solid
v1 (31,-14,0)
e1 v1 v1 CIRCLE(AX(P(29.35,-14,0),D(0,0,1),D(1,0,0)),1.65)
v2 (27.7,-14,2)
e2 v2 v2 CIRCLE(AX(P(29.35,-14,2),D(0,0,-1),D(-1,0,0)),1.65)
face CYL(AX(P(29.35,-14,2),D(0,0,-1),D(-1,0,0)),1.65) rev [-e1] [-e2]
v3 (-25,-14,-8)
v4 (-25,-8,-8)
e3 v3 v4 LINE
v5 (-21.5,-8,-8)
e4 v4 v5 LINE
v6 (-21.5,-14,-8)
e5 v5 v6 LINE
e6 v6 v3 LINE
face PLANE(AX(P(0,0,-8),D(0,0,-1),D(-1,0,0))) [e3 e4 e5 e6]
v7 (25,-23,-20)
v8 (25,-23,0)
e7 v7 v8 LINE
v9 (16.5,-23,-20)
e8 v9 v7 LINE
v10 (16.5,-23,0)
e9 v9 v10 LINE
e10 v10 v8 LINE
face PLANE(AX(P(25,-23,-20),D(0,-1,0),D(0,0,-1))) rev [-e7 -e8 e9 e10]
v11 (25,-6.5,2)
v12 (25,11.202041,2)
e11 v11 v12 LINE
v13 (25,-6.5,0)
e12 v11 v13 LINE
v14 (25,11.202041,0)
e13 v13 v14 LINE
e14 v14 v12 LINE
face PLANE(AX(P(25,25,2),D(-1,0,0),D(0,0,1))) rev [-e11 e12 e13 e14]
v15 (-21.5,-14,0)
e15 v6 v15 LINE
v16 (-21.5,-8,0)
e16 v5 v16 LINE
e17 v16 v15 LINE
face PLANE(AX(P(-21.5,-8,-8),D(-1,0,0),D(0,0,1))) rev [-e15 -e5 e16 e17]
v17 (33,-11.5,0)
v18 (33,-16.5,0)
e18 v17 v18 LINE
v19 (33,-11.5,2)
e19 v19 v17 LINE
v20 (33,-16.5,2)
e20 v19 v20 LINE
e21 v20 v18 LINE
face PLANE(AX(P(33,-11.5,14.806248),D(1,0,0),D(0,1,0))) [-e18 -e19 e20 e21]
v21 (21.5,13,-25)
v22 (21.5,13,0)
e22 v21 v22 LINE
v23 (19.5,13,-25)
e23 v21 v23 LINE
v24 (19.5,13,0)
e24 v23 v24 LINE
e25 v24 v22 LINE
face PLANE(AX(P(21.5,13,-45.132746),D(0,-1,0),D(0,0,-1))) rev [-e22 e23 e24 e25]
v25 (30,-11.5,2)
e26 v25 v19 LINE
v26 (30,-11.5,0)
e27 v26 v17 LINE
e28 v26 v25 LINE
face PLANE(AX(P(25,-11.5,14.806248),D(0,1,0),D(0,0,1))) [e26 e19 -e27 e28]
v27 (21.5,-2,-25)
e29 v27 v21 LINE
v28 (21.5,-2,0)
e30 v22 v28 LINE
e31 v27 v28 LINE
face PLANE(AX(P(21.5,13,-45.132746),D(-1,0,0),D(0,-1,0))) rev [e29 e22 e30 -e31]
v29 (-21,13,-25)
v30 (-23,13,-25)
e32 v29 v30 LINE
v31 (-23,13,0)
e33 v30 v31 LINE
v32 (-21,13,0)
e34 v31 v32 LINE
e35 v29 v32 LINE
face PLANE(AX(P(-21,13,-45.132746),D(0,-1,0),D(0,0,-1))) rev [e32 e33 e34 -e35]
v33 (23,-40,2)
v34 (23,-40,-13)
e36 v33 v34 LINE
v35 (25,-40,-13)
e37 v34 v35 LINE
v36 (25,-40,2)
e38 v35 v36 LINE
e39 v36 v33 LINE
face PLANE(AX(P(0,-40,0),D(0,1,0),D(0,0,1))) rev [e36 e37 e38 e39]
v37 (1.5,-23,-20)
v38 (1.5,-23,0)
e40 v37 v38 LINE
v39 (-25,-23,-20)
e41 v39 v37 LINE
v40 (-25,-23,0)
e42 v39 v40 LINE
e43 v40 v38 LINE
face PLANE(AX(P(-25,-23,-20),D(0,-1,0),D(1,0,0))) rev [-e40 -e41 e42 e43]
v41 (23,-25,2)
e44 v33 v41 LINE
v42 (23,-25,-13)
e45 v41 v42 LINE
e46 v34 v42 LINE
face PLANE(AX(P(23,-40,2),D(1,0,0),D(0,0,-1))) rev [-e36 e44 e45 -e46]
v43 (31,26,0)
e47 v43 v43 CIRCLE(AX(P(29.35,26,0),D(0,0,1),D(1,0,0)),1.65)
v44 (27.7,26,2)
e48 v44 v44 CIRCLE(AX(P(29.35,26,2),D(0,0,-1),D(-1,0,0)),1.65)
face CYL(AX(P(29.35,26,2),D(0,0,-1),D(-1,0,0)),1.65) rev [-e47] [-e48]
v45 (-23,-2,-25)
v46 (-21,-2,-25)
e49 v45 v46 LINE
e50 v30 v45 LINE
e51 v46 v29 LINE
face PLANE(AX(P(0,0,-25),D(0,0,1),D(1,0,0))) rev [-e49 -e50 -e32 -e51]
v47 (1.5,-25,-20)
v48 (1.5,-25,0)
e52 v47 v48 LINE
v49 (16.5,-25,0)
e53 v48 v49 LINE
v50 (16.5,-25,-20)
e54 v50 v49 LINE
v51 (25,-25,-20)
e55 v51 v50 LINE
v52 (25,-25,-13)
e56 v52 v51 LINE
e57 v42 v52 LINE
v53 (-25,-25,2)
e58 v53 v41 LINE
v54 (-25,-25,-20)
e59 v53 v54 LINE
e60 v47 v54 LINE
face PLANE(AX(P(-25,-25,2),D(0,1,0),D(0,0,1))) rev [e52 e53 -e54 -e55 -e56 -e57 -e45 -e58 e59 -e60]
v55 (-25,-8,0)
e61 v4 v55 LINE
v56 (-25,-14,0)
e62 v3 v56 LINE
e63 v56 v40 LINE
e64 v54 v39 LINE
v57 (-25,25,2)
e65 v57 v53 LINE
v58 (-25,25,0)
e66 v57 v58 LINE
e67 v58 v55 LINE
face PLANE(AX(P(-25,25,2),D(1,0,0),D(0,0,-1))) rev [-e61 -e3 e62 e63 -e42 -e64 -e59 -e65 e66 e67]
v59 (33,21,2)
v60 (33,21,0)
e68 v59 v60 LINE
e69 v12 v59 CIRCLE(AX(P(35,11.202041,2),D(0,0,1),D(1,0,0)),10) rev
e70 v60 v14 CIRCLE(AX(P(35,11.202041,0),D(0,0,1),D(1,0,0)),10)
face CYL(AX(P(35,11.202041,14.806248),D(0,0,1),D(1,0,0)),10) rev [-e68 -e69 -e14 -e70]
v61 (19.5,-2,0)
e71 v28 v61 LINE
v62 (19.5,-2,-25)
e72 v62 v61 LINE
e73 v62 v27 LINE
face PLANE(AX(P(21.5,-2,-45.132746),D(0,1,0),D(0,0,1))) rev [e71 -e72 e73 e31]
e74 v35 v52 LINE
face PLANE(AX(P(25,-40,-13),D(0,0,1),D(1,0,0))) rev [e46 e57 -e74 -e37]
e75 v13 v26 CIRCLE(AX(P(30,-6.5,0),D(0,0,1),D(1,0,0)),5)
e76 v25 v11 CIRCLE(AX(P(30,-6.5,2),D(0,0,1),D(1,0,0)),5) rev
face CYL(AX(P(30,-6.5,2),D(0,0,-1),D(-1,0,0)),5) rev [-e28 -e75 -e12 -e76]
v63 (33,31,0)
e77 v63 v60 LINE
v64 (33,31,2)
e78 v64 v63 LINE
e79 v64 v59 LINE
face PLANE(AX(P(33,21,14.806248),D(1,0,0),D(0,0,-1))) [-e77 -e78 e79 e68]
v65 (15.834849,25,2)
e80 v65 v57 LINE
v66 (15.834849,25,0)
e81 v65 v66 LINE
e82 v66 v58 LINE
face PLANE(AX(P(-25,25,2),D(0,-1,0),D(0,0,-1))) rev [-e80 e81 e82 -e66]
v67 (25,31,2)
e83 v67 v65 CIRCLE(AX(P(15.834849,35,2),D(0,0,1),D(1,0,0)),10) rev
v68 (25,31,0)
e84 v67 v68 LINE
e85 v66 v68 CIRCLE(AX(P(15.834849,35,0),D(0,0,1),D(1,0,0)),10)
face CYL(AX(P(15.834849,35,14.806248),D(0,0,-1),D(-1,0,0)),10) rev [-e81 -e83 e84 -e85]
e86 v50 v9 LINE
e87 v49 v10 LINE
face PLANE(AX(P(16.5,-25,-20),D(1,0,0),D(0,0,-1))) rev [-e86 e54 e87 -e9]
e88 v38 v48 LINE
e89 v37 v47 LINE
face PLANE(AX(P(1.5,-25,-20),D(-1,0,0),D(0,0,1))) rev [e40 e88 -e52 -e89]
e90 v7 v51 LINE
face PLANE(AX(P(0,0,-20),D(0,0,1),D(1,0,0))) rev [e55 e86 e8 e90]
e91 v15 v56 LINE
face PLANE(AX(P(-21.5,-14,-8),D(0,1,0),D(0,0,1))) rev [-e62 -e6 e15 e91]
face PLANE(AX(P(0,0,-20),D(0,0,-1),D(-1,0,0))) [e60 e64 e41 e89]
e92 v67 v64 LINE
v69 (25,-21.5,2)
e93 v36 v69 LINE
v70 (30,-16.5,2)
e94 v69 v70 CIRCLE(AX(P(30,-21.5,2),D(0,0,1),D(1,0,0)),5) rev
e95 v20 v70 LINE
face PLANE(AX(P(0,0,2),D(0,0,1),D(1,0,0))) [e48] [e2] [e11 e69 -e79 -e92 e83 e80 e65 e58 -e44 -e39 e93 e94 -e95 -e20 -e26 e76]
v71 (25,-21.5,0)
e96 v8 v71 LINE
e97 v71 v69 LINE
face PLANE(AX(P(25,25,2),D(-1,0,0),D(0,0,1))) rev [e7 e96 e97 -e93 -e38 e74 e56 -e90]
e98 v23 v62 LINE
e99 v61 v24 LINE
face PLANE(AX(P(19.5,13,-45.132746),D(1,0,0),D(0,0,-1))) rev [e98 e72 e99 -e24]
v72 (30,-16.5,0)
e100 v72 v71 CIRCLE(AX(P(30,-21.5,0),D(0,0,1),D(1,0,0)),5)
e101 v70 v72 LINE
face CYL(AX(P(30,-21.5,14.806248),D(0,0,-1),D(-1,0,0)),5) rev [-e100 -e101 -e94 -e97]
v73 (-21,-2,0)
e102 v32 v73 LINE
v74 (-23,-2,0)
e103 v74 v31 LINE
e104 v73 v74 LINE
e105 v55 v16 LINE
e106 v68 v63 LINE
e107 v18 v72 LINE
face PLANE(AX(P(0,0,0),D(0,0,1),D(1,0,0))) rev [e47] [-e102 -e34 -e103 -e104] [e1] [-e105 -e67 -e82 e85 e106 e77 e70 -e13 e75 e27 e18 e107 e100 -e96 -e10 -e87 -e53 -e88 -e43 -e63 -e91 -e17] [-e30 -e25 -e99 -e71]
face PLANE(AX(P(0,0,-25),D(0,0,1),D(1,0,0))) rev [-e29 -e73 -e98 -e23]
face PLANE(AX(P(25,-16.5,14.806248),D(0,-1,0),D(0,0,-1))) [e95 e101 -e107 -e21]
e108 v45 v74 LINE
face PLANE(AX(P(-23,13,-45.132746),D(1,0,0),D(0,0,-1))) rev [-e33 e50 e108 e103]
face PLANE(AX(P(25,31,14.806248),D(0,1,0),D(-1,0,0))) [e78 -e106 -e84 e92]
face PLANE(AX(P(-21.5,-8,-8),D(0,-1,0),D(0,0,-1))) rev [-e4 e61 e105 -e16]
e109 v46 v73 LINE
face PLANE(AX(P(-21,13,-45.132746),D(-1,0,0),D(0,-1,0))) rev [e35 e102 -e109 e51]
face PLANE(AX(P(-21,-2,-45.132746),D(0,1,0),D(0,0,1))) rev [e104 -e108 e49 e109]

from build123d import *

# Parameters (mm, degrees)
SKETCH1_W               = 50
SKETCH1_H               = 50
BOSS_EXTRUDE1_DEPTH     = 2
SKETCH2_W               = 8.5
SKETCH2_H               = 2
SKETCH2_W_2             = 26.5
BOSS_EXTRUDE2_DEPTH     = 20
SKETCH3_W               = 2
SKETCH3_H               = 15
BOSS_EXTRUDE3_DEPTH     = 15
SKETCH5_W               = 2
SKETCH5_H               = 15
BOSS_EXTRUDE5_DEPTH     = 25
SKETCH6_W               = 8
SKETCH6_H               = 5
SKETCH6_H_2             = 10
BOSS_EXTRUDE6_DEPTH     = 2
FILLET1_R               = 10
FILLET2_R               = 10
FILLET3_R               = 5
CUT_EXTRUDE1_DEPTH      = 58.567351858
CUT_EXTRUDE1_DEPTH_BACK = 58.567351858
SKETCH7_R               = 1.65
SKETCH8_W               = 3.5
SKETCH8_H               = 6
BOSS_EXTRUDE7_DEPTH     = 8


with BuildPart() as part:
    # Sketch1 → Boss-Extrude1 (new body)
    with BuildSketch(Plane.XY):
        Rectangle(SKETCH1_W, SKETCH1_H)
    extrude(amount=BOSS_EXTRUDE1_DEPTH)

    # Sketch2 → Boss-Extrude2 (add)
    with BuildSketch(Plane(origin=(0, 0, 0), x_dir=(-1, 0, 0), z_dir=(0, 0, -1))):
        with Locations((-20.75, -24)):
            Rectangle(SKETCH2_W, SKETCH2_H)
        with Locations((11.75, -24)):
            Rectangle(SKETCH2_W_2, SKETCH2_H)
    extrude(amount=BOSS_EXTRUDE2_DEPTH)

    # Sketch3 → Boss-Extrude3 (add)
    with BuildSketch(Plane.XZ.offset(25)):
        with Locations((24, -5.5)):
            Rectangle(SKETCH3_W, SKETCH3_H)
    extrude(amount=BOSS_EXTRUDE3_DEPTH)

    # Sketch5 → Boss-Extrude5 (add)
    with BuildSketch(Plane(origin=(0, 0, 0), x_dir=(-1, 0, 0), z_dir=(0, 0, -1))):
        with Locations((-20.5, 5.5)):
            Rectangle(SKETCH5_W, SKETCH5_H)
        with Locations((22, 5.5)):
            Rectangle(SKETCH5_W, SKETCH5_H)
    extrude(amount=BOSS_EXTRUDE5_DEPTH)

    # Sketch6 → Boss-Extrude6 (add)
    with BuildSketch(Plane(origin=(0, 0, 0), x_dir=(-1, 0, 0), z_dir=(0, 0, -1))):
        with Locations((-29, -14)):
            Rectangle(SKETCH6_W, SKETCH6_H)
        with Locations((-29, 26)):
            Rectangle(SKETCH6_W, SKETCH6_H_2)
    extrude(amount=-BOSS_EXTRUDE6_DEPTH)

    # Fillet1
    # the kernel refuses this fillet: 10 mm, written as the material it adds along each edge
    with BuildSketch(Plane(origin=(25, 25, 0), x_dir=(-1, 0, 0), z_dir=(0, 0, 1))) as fillet1_piece_1:
        with BuildLine():
            CenterArc((9.16515139, -10), FILLET1_R, 90, 66.421821522)
            Line((0, -6), (-0.183303028, -5.92))
            ThreePointArc((-0.183303028, -5.92), (-0.2, -3), (-0.2, 0))
            Line((-0.2, 0), (0, 0.2))
            Line((0, 0.2), (9.16515139, 0.2))
            Line((9.16515139, 0.2), (9.16515139, 0))
        make_face()
    extrude(amount=2)

    # Fillet2
    # the kernel refuses this fillet: 10 mm, written as the material it adds along each edge
    with BuildSketch(Plane(origin=(25, 21, 0), x_dir=(0, -1, 0), z_dir=(0, 0, 1))) as fillet2_piece_1:
        with BuildLine():
            CenterArc((9.797958971, 10), FILLET2_R, 191.536959033, 78.463040967)
            Line((0, 8), (-0.195959179, 7.96))
            ThreePointArc((-0.195959179, 7.96), (-0.2, 4), (-0.2, 0))
            Line((-0.2, 0), (0, -0.2))
            Line((0, -0.2), (9.797958971, -0.2))
            Line((9.797958971, -0.2), (9.797958971, 0))
        make_face()
    extrude(amount=2)

    # Fillet3
    fillet3_edges = [part.edges().sort_by_distance(p)[0] for p in [
        (25, -16.5, 1),
        (25, -11.5, 1),
    ]]
    fillet(fillet3_edges, radius=FILLET3_R)

    # Sketch7 → Cut-Extrude1 (cut, two sides: drawn at the far end of the back side and taken through both)
    with BuildSketch(Plane(origin=(0, 0, 0), x_dir=(-1, 0, 0), z_dir=(0, 0, -1)).offset(-CUT_EXTRUDE1_DEPTH_BACK)):
        with Locations((-29.35, -14)):
            Circle(SKETCH7_R)
        with Locations((-29.35, 26)):
            Circle(SKETCH7_R)
    extrude(amount=CUT_EXTRUDE1_DEPTH + CUT_EXTRUDE1_DEPTH_BACK, mode=Mode.SUBTRACT)

    # Sketch8 → Boss-Extrude7 (add)
    with BuildSketch(Plane(origin=(0, 0, 0), x_dir=(-1, 0, 0), z_dir=(0, 0, -1))):
        with Locations((23.25, -11)):
            Rectangle(SKETCH8_W, SKETCH8_H)
    extrude(amount=BOSS_EXTRUDE7_DEPTH)


solid = part.part
